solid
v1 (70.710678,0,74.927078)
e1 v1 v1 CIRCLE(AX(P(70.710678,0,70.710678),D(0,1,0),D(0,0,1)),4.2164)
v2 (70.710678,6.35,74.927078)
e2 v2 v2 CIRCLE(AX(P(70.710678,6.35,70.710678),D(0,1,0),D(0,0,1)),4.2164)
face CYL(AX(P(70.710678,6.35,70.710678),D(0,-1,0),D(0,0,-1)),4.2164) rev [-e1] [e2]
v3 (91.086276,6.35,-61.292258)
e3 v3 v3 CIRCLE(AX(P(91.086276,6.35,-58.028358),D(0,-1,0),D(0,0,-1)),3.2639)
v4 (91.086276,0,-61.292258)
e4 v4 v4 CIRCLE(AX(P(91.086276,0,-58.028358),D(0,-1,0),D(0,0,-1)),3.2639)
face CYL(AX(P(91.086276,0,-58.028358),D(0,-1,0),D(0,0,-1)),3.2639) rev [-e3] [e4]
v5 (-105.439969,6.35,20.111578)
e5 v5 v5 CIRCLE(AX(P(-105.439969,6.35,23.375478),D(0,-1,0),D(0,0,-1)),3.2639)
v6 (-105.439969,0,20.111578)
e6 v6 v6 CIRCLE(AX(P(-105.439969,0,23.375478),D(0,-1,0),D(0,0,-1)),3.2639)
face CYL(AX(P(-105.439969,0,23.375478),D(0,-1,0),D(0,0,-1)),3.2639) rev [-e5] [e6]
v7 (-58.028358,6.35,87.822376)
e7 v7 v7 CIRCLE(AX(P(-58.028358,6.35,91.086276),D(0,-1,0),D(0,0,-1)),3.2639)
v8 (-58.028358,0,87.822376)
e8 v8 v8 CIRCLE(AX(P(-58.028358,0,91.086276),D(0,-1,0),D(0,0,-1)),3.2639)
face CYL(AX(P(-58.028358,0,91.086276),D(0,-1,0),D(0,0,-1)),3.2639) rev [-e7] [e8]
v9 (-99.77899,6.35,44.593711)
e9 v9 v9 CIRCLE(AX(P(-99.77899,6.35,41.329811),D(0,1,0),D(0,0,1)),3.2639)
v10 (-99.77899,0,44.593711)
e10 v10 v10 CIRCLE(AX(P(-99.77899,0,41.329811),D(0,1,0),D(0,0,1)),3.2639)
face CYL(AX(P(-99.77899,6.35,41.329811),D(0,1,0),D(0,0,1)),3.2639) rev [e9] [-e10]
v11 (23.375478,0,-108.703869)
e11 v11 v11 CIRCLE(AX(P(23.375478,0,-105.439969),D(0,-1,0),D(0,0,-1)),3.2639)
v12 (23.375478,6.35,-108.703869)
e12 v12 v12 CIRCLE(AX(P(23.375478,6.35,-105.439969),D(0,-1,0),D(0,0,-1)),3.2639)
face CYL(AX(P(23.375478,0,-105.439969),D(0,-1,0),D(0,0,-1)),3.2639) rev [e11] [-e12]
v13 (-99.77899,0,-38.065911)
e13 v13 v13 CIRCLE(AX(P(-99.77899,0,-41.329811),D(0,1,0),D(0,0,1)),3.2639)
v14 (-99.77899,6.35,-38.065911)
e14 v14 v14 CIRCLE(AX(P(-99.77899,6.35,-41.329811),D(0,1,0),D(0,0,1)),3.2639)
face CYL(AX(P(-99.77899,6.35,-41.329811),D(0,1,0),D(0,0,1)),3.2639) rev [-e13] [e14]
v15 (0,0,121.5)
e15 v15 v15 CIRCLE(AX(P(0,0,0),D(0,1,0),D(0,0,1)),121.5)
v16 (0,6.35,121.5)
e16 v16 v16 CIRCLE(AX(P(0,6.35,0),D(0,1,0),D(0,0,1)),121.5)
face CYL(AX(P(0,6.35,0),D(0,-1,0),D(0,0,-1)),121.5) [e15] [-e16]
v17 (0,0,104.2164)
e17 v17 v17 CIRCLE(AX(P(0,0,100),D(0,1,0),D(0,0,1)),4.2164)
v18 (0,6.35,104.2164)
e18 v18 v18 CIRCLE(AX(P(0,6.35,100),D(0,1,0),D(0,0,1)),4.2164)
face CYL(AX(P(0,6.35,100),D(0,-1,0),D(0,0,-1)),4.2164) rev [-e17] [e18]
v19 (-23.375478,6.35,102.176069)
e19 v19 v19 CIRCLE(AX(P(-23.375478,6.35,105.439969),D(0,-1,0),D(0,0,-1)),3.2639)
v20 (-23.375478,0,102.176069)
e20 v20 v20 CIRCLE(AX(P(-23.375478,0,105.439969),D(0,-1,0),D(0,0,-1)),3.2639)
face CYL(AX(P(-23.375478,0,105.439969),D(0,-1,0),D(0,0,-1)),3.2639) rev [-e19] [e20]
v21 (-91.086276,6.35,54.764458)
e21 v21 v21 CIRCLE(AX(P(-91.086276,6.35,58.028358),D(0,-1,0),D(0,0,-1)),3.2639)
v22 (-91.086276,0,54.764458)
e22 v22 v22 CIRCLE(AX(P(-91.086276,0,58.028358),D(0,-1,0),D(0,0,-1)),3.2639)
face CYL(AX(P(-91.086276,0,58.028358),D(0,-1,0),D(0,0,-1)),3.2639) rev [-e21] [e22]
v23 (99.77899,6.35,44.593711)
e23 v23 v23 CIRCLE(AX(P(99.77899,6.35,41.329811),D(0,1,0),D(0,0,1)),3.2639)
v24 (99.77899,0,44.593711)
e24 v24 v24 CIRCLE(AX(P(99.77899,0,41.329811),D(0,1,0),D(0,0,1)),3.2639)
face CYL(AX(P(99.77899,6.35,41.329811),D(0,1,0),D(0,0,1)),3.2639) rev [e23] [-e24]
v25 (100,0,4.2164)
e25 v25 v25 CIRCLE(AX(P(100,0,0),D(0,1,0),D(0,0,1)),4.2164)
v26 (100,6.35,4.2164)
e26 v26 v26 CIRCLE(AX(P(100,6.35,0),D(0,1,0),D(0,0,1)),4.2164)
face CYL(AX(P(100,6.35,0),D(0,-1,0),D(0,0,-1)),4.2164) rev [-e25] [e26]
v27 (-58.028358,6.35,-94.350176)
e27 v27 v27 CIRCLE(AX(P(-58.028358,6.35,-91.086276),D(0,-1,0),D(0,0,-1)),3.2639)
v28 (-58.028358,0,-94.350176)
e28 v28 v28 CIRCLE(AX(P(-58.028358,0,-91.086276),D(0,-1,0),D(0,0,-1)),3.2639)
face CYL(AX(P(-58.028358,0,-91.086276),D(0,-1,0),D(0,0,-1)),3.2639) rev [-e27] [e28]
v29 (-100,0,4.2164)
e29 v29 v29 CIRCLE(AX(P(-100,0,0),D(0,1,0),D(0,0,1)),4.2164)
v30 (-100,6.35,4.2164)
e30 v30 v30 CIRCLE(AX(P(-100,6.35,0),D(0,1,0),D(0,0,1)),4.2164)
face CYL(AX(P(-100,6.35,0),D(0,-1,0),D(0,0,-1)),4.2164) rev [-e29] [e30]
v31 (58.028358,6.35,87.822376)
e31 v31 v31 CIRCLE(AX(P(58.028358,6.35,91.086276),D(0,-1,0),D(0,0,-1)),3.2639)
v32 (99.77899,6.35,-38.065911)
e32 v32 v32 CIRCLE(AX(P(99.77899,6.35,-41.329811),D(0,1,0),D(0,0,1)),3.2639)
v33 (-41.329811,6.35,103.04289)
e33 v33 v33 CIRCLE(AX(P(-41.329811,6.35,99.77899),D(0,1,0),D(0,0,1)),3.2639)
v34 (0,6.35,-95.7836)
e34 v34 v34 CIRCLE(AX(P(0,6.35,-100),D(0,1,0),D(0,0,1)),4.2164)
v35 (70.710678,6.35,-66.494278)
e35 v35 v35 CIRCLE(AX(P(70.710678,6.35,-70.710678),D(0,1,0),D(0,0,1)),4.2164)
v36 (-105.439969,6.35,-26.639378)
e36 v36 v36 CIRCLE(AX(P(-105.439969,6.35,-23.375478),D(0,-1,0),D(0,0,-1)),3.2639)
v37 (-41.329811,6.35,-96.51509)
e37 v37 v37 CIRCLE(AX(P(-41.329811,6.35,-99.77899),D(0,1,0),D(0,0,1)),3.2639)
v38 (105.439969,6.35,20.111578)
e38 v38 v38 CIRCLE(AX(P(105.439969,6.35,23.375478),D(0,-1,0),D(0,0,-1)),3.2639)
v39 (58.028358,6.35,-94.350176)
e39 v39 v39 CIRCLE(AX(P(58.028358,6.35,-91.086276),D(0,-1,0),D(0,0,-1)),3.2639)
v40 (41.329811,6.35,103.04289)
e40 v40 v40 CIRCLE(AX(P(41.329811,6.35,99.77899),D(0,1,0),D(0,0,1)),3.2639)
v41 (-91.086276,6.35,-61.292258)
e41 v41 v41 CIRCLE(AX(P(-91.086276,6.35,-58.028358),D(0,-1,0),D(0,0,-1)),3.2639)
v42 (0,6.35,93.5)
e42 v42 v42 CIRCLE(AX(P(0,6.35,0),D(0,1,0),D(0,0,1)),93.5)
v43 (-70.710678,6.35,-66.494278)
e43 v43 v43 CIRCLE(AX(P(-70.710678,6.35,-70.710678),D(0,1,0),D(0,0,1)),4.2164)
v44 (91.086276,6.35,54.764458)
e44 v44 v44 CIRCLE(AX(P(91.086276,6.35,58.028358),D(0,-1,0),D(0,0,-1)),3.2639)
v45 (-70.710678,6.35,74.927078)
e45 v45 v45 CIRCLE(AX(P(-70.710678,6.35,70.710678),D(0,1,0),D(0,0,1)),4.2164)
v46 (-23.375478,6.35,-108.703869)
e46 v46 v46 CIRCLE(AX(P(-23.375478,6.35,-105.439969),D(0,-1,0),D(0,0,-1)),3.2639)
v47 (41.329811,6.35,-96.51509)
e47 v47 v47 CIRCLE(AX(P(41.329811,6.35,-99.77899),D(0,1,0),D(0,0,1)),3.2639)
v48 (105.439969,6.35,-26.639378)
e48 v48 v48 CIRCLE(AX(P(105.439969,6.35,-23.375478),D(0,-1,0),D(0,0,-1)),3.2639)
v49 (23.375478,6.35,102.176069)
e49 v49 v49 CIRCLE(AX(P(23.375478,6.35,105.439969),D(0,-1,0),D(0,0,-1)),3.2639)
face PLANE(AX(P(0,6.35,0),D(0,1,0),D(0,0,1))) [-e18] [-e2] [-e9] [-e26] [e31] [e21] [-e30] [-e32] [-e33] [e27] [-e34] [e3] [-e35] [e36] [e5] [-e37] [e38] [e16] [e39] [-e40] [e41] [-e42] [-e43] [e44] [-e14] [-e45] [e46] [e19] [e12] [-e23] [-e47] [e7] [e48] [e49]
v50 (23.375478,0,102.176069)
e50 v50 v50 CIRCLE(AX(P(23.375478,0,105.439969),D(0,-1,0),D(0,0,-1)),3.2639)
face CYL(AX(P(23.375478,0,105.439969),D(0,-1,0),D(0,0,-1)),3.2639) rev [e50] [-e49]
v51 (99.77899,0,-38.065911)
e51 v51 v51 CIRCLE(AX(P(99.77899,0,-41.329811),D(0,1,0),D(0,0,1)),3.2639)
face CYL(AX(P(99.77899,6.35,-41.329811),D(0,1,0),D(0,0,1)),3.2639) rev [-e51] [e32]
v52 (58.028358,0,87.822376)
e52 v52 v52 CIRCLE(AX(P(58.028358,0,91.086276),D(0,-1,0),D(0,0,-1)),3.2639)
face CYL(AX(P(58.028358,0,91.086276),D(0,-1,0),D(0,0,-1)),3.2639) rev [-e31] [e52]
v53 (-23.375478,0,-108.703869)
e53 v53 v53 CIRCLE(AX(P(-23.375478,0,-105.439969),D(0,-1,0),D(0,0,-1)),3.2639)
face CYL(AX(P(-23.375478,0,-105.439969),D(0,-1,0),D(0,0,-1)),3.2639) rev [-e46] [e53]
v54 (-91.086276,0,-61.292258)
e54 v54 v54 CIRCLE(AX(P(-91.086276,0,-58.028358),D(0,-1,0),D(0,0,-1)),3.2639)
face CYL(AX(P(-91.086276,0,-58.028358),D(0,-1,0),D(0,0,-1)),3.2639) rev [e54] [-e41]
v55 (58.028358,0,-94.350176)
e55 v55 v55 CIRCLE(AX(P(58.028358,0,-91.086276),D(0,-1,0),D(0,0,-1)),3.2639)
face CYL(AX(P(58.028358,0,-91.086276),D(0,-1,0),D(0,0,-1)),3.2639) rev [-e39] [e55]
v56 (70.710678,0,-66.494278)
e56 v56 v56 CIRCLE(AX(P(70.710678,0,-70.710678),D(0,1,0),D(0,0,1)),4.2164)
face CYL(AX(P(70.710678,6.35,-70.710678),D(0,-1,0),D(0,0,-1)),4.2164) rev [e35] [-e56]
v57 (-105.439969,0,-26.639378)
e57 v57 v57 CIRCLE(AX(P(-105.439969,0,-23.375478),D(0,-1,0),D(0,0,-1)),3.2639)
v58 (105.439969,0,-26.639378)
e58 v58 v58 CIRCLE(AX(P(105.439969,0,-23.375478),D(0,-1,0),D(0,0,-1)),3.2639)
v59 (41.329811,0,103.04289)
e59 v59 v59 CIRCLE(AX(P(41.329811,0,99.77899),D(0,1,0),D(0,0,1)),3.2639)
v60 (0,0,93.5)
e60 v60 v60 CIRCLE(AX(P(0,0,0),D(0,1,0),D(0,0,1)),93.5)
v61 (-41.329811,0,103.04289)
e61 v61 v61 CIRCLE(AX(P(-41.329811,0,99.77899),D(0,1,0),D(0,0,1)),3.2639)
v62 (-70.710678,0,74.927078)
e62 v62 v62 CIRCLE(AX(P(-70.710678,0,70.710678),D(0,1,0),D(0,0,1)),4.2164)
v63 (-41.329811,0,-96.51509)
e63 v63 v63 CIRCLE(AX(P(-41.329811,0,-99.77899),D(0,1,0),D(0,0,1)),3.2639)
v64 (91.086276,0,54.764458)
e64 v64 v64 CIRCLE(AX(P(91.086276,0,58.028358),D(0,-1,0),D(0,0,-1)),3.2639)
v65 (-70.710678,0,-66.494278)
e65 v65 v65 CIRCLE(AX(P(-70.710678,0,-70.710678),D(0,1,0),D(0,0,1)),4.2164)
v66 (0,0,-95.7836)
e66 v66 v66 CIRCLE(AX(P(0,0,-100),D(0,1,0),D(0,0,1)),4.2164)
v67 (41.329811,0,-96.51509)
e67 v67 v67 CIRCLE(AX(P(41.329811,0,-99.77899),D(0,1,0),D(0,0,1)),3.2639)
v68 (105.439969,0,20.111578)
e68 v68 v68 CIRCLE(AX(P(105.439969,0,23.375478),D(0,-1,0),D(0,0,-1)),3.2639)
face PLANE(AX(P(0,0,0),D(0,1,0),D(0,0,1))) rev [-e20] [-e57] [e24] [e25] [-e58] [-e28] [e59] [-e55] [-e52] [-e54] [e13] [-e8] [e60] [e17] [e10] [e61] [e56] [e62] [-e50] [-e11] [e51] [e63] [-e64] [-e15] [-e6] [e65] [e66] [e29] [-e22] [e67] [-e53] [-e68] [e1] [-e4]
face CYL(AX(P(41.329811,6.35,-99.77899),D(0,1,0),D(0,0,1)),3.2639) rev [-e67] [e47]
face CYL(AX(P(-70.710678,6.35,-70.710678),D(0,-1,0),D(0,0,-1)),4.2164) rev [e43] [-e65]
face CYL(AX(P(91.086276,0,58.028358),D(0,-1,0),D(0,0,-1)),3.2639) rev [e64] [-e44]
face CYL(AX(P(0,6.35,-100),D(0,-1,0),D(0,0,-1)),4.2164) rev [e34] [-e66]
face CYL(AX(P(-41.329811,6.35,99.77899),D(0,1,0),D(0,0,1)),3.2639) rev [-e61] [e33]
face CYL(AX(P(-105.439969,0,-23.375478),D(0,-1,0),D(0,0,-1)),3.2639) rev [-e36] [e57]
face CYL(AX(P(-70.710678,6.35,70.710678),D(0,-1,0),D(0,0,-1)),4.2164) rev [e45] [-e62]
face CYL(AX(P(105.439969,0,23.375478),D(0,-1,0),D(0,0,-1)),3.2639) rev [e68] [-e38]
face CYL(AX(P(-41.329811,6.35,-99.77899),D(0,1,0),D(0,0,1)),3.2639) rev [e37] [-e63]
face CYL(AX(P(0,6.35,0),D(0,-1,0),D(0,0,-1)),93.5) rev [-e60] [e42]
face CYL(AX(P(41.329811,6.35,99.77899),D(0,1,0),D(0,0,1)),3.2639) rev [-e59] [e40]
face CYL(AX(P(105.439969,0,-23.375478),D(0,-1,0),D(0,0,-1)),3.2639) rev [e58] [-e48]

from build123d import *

# Parameters (mm, degrees)
SKETCH1_R                            = 121.5
SKETCH1_R_2                          = 93.5
SKETCH1_R_3                          = 4.2164
BOSS_EXTRUDE1_DEPTH                  = 6.35
STOPING_SCREW_5_16_18_TAPPED_HOLE1_D = 6.5278
STOP_SCREW_CIRPATTERN1_COUNT         = 8
F_5_16_18_TAPPED_HOLE1_OUTLINE_R     = 3.2639
F_5_16_18_TAPPED_HOLE1_DEPTH         = 6.35
CIRPATTERN1_COUNT                    = 8


# Read off the part's stored shape, not the designer's step: 5/16-18 Tapped Hole1
with BuildPart() as part:
    # Sketch1 → Boss-Extrude1 (new body)
    with BuildSketch(Plane(origin=(0, 0, 0), x_dir=(1, 0, 0), z_dir=(0, 1, 0))):
        with Locations(Location((0, 0, 0), (0, 0, 270))):
            Circle(SKETCH1_R)
        with Locations(Location((0, 0, 0), (0, 0, 270))):
            Circle(SKETCH1_R_2, mode=Mode.SUBTRACT)
        with Locations(Location((0, 100, 0), (0, 0, 270))):
            Circle(SKETCH1_R_3, mode=Mode.SUBTRACT)
        with Locations(Location((70.710678119, 70.710678119, 0), (0, 0, 270))):
            Circle(SKETCH1_R_3, mode=Mode.SUBTRACT)
        with Locations(Location((100, 0, 0), (0, 0, 270))):
            Circle(SKETCH1_R_3, mode=Mode.SUBTRACT)
        with Locations(Location((70.710678119, -70.710678119, 0), (0, 0, 270))):
            Circle(SKETCH1_R_3, mode=Mode.SUBTRACT)
        with Locations(Location((0, -100, 0), (0, 0, 270))):
            Circle(SKETCH1_R_3, mode=Mode.SUBTRACT)
        with Locations(Location((-70.710678119, -70.710678119, 0), (0, 0, 270))):
            Circle(SKETCH1_R_3, mode=Mode.SUBTRACT)
        with Locations(Location((-100, 0, 0), (0, 0, 270))):
            Circle(SKETCH1_R_3, mode=Mode.SUBTRACT)
        with Locations(Location((-70.710678119, 70.710678119, 0), (0, 0, 270))):
            Circle(SKETCH1_R_3, mode=Mode.SUBTRACT)
    extrude(amount=BOSS_EXTRUDE1_DEPTH)

    # Stoping_Screw_5/16-18 Tapped Hole1 (through all)
    with Locations(Plane(origin=(41.329810695, 6.35, 99.778989511), x_dir=(0, 0, 1), z_dir=(0, 1, 0))):
        with Locations((0, 0)):
            stoping_screw_5_16_18_tapped_hole1 = Hole(STOPING_SCREW_5_16_18_TAPPED_HOLE1_D / 2)

    # Stop_Screw_CirPattern1: Stoping_Screw_5/16-18 Tapped Hole1 ×8 about axis
    stop_screw_cirpattern1_axis = Axis((0, 0, 0), (0, 1, 0))
    for i in range(1, STOP_SCREW_CIRPATTERN1_COUNT):
        add(stoping_screw_5_16_18_tapped_hole1.rotate(stop_screw_cirpattern1_axis, i * 360 / STOP_SCREW_CIRPATTERN1_COUNT), mode=Mode.SUBTRACT)

    # 5/16-18 Tapped Hole1 outline → 5/16-18 Tapped Hole1 (cut)
    with BuildSketch(Plane(origin=(0, 0, 0), x_dir=(1, 0, 0), z_dir=(0, 1, 0))):
        with Locations((58.028357701, -91.086276148)):
            Circle(F_5_16_18_TAPPED_HOLE1_OUTLINE_R)
        with Locations((23.375478305, -105.439968769)):
            Circle(F_5_16_18_TAPPED_HOLE1_OUTLINE_R)
    f_5_16_18_tapped_hole1 = extrude(amount=F_5_16_18_TAPPED_HOLE1_DEPTH, mode=Mode.SUBTRACT)

    # CirPattern1: 5/16-18 Tapped Hole1 ×8 about axis
    cirpattern1_axis = Axis((0, 0, 0), (0, 1, 0))
    for i in range(1, CIRPATTERN1_COUNT):
        add(f_5_16_18_tapped_hole1.rotate(cirpattern1_axis, i * 360 / CIRPATTERN1_COUNT), mode=Mode.SUBTRACT)


solid = part.part
